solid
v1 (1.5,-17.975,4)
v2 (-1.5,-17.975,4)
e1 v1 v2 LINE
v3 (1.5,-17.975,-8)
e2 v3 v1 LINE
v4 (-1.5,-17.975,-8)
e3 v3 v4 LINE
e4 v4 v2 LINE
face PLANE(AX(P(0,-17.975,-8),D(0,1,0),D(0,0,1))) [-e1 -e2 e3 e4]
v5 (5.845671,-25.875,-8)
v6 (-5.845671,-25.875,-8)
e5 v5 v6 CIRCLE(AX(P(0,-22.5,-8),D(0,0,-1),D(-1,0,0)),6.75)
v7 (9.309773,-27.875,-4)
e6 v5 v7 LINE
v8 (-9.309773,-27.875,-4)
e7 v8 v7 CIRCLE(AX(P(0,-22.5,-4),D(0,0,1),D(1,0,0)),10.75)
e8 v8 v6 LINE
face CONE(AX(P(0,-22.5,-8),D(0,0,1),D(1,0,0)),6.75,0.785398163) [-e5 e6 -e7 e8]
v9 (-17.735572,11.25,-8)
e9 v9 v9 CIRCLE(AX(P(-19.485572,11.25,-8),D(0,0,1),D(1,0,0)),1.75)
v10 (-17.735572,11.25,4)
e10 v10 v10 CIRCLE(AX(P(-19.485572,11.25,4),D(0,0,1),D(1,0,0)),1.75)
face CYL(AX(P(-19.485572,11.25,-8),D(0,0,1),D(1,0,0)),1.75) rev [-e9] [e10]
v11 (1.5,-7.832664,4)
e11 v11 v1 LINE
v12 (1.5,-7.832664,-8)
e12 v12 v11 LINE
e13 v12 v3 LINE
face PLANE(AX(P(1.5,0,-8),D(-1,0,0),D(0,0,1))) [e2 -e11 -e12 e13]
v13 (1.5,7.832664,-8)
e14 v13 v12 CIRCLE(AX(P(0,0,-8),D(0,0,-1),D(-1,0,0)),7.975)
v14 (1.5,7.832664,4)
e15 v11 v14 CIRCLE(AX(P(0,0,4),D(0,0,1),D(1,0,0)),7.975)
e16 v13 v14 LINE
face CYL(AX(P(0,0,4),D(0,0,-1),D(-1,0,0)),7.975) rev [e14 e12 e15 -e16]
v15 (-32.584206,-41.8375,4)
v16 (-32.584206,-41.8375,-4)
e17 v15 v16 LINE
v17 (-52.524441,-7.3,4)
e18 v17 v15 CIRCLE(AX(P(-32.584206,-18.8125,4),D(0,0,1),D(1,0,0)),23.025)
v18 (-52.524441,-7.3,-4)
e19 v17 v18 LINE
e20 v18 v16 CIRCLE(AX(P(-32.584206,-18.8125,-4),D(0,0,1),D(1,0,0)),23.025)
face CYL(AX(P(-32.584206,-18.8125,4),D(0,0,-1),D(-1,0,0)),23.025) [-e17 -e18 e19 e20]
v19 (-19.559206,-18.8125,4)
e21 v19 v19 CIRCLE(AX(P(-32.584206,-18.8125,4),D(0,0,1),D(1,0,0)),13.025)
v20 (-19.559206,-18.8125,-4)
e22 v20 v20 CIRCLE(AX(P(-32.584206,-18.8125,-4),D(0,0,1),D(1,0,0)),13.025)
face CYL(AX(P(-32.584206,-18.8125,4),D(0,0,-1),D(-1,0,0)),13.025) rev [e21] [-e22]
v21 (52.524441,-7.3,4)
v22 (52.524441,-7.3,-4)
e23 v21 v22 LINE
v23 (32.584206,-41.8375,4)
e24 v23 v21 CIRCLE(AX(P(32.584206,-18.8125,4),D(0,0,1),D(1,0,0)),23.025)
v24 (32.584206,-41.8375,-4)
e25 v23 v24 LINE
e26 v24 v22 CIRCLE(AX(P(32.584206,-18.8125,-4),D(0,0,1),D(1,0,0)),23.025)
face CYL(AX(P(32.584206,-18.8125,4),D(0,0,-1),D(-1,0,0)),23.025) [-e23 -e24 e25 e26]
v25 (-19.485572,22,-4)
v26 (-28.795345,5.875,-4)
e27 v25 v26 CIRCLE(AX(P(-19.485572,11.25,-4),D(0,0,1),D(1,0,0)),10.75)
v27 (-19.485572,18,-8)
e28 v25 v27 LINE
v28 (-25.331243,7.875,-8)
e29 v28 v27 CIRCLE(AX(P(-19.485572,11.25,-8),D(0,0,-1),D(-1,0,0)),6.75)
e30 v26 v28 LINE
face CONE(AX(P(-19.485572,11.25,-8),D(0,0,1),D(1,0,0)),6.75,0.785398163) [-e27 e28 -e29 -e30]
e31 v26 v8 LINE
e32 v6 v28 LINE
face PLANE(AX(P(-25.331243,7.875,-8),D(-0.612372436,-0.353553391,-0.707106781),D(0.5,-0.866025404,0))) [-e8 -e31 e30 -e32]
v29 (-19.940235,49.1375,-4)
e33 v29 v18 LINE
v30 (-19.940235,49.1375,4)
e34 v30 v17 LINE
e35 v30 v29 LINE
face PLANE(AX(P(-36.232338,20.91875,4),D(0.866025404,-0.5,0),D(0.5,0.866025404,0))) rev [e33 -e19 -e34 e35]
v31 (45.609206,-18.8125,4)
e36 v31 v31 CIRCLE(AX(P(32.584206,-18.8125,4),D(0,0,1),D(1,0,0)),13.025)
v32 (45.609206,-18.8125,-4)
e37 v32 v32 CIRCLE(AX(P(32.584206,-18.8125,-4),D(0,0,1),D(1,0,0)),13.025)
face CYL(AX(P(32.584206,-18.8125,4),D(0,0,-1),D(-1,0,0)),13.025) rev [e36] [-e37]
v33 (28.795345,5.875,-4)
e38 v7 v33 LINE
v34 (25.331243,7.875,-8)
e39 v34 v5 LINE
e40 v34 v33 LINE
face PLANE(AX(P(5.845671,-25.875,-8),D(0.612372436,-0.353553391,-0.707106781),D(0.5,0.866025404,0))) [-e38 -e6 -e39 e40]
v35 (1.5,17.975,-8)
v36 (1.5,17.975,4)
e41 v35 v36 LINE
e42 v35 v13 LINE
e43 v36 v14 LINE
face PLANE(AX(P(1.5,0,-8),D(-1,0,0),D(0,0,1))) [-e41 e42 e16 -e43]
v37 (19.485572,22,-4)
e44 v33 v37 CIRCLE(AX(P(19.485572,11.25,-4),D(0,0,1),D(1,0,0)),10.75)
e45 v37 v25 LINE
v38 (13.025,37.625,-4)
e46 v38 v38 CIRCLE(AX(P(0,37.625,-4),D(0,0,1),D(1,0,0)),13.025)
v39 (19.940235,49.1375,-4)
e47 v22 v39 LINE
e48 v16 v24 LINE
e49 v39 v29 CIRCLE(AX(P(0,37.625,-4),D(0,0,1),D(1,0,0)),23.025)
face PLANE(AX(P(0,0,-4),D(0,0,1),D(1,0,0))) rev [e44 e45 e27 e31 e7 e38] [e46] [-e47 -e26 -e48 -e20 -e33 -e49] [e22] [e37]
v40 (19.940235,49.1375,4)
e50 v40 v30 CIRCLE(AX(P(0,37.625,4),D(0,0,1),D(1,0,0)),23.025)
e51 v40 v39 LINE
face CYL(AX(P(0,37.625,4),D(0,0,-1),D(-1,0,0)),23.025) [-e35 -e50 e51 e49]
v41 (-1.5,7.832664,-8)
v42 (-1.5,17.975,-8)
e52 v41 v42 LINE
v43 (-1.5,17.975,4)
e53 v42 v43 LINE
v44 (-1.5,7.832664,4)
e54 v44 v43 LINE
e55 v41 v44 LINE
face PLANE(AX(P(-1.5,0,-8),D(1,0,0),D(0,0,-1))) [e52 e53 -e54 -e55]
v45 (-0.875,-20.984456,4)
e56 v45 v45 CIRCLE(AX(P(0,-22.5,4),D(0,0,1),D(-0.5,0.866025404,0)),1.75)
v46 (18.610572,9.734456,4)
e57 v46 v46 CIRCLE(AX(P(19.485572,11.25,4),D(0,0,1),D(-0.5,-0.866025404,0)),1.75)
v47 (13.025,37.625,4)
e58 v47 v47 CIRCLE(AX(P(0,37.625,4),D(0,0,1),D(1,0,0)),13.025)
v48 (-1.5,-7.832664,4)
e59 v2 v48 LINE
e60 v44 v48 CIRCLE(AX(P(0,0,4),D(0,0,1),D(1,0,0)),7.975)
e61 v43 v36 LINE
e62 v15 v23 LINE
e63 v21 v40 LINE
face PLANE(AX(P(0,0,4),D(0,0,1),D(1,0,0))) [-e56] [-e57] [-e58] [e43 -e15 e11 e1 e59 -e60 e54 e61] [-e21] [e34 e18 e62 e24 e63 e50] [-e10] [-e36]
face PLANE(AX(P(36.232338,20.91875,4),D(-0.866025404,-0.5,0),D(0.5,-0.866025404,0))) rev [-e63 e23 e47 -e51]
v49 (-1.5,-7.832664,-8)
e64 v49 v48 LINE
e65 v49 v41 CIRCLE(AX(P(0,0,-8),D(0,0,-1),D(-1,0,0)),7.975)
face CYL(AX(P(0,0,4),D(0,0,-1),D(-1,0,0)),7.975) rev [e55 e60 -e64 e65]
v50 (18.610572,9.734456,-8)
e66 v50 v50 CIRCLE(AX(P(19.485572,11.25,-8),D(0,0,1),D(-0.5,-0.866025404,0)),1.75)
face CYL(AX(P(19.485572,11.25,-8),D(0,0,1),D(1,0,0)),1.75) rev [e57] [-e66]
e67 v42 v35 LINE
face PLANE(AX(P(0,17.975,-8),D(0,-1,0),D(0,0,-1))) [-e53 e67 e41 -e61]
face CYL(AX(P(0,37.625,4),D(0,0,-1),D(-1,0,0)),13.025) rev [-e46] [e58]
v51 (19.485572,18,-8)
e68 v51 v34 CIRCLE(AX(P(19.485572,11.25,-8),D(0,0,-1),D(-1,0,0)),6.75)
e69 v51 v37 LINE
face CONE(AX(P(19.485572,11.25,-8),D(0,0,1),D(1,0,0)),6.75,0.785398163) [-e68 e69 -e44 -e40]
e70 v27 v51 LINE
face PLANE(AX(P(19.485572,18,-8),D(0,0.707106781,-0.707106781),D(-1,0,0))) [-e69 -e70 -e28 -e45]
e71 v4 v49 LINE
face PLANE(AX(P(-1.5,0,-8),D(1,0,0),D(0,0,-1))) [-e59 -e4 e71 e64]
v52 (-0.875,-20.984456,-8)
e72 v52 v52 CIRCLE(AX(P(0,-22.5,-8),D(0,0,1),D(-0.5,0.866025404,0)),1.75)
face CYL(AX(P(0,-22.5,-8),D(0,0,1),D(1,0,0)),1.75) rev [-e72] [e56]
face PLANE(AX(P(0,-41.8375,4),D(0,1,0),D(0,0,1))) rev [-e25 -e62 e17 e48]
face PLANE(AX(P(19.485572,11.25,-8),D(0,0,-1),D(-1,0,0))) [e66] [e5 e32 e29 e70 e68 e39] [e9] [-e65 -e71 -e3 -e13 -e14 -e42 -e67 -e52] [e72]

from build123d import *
from build123d.topology import SkipClean

# Parameters (mm, degrees)
SKETCH1_R           = 23.025
SKETCH1_R_2         = 13.025
SKETCH1_R_3         = 7.975
BOSS_EXTRUDE1_DEPTH = 4
BOSS_EXTRUDE3_START = 4
SKETCH5_R           = 7.975
BOSS_EXTRUDE3_DEPTH = 4
CHAMFER2_SIZE       = 4
CUT_EXTRUDE1_DEPTH  = 84.155314152
SKETCH3_R           = 1.75
CUT_EXTRUDE2_DEPTH  = 84.155314152
CIRPATTERN2_COUNT   = 3
CIRPATTERN3_COUNT   = 2


with BuildPart() as part:
    # Sketch1 → Boss-Extrude1 (new, symmetric)
    # profile 1 of 4: a face of its own
    with BuildSketch(Plane.XY):
        with Locations((0, 37.625)):
            Circle(SKETCH1_R)
        with Locations((0, 37.625)):
            Circle(SKETCH1_R_2, mode=Mode.SUBTRACT)
    # profile 2 of 4: a face of its own
    with BuildSketch(Plane.XY):
        with BuildLine():
            ThreePointArc((23.025, 37.625), (-5.959308513, 15.38455785), (-19.940234922, 49.1375))
            Line((-19.940234922, 49.1375), (-52.52444074, -7.3))
            ThreePointArc((-52.52444074, -7.3), (-26.624897304, 3.42794215), (-9.559205817, -18.8125))
            ThreePointArc((-9.559205817, -18.8125), (-16.303072181, -35.093633637), (-32.584205817, -41.8375))
            Line((-32.584205817, -41.8375), (32.584205817, -41.8375))
            ThreePointArc((32.584205817, -41.8375), (12.643970895, -7.3), (52.52444074, -7.3))
            Line((52.52444074, -7.3), (19.940234922, 49.1375))
            ThreePointArc((19.940234922, 49.1375), (22.24044215, 43.584308513), (23.025, 37.625))
        make_face()
        Circle(SKETCH1_R_3, mode=Mode.SUBTRACT)
    # profile 3 of 4: a face of its own
    with BuildSketch(Plane.XY):
        with Locations((-32.584205817, -18.8125)):
            Circle(SKETCH1_R)
        with Locations((-32.584205817, -18.8125)):
            Circle(SKETCH1_R_2, mode=Mode.SUBTRACT)
    # profile 4 of 4: a face of its own
    with BuildSketch(Plane.XY):
        with Locations((32.584205817, -18.8125)):
            Circle(SKETCH1_R)
        with Locations((32.584205817, -18.8125)):
            Circle(SKETCH1_R_2, mode=Mode.SUBTRACT)
    extrude(amount=BOSS_EXTRUDE1_DEPTH, both=True)

    # Sketch5 → Boss-Extrude3 (add)
    with SkipClean():  # the faces are left unmerged after this step: merging them gives an invalid solid
        with BuildSketch(Plane(origin=(0, 0, -4), x_dir=(-1, 0, 0), z_dir=(0, 0, -1)).offset(BOSS_EXTRUDE3_START)):
            with BuildLine():
                Line((-5.845671476, -25.875), (-25.331243061, 7.875))
                ThreePointArc((-25.331243061, 7.875), (-25.331243061, 14.625), (-19.485571585, 18))
                Line((-19.485571585, 18), (19.485571585, 18))
                ThreePointArc((19.485571585, 18), (25.331243061, 14.625), (25.331243061, 7.875))
                Line((25.331243061, 7.875), (5.845671476, -25.875))
                ThreePointArc((5.845671476, -25.875), (0, -29.25), (-5.845671476, -25.875))
            make_face()
            Circle(SKETCH5_R, mode=Mode.SUBTRACT)
        extrude(amount=-BOSS_EXTRUDE3_DEPTH)

    # Chamfer2
    chamfer2_edges = [part.edges().sort_by_distance(p)[0] for p in [
        (0, -29.25, -4),
        (-15.588457268, -9, -4),
        (15.588457268, -9, -4),
        (-25.331243061, 14.625, -4),
        (25.331243061, 14.625, -4),
        (0, 18, -4),
    ]]
    chamfer(chamfer2_edges, length=CHAMFER2_SIZE - 0.0001)  # a hair under: the kernel refuses the full size

    # Sketch2 → Cut-Extrude1 (cut, through all)
    with BuildSketch(Plane.XY.offset(4)):
        with BuildLine():
            Line((-1.5, 17.975), (-1.5, 7.832663978))
            ThreePointArc((-1.5, 7.832663978), (0, 7.975), (1.5, 7.832663978))
            Line((1.5, 7.832663978), (1.5, 17.975))
            Line((1.5, 17.975), (-1.5, 17.975))
        make_face()
    cut_extrude1 = extrude(amount=-CUT_EXTRUDE1_DEPTH, mode=Mode.SUBTRACT)

    # Sketch3 → Cut-Extrude2 (cut, through all)
    with BuildSketch(Plane.XY.offset(4)):
        with Locations((-19.485571585, 11.25)):
            Circle(SKETCH3_R)
    cut_extrude2 = extrude(amount=-CUT_EXTRUDE2_DEPTH, mode=Mode.SUBTRACT)

    # CirPattern2: Cut-Extrude2 ×3 about axis
    cirpattern2_axis = Axis((0, 0, 0), (0, 0, 1))
    for i in range(1, CIRPATTERN2_COUNT):
        add(cut_extrude2.rotate(cirpattern2_axis, i * 360 / CIRPATTERN2_COUNT), mode=Mode.SUBTRACT)

    # CirPattern3: Cut-Extrude1 ×2 about axis
    cirpattern3_axis = Axis((0, 0, 0), (0, 0, 1))
    for i in range(1, CIRPATTERN3_COUNT):
        add(cut_extrude1.rotate(cirpattern3_axis, i * 360 / CIRPATTERN3_COUNT), mode=Mode.SUBTRACT)


solid = part.part
